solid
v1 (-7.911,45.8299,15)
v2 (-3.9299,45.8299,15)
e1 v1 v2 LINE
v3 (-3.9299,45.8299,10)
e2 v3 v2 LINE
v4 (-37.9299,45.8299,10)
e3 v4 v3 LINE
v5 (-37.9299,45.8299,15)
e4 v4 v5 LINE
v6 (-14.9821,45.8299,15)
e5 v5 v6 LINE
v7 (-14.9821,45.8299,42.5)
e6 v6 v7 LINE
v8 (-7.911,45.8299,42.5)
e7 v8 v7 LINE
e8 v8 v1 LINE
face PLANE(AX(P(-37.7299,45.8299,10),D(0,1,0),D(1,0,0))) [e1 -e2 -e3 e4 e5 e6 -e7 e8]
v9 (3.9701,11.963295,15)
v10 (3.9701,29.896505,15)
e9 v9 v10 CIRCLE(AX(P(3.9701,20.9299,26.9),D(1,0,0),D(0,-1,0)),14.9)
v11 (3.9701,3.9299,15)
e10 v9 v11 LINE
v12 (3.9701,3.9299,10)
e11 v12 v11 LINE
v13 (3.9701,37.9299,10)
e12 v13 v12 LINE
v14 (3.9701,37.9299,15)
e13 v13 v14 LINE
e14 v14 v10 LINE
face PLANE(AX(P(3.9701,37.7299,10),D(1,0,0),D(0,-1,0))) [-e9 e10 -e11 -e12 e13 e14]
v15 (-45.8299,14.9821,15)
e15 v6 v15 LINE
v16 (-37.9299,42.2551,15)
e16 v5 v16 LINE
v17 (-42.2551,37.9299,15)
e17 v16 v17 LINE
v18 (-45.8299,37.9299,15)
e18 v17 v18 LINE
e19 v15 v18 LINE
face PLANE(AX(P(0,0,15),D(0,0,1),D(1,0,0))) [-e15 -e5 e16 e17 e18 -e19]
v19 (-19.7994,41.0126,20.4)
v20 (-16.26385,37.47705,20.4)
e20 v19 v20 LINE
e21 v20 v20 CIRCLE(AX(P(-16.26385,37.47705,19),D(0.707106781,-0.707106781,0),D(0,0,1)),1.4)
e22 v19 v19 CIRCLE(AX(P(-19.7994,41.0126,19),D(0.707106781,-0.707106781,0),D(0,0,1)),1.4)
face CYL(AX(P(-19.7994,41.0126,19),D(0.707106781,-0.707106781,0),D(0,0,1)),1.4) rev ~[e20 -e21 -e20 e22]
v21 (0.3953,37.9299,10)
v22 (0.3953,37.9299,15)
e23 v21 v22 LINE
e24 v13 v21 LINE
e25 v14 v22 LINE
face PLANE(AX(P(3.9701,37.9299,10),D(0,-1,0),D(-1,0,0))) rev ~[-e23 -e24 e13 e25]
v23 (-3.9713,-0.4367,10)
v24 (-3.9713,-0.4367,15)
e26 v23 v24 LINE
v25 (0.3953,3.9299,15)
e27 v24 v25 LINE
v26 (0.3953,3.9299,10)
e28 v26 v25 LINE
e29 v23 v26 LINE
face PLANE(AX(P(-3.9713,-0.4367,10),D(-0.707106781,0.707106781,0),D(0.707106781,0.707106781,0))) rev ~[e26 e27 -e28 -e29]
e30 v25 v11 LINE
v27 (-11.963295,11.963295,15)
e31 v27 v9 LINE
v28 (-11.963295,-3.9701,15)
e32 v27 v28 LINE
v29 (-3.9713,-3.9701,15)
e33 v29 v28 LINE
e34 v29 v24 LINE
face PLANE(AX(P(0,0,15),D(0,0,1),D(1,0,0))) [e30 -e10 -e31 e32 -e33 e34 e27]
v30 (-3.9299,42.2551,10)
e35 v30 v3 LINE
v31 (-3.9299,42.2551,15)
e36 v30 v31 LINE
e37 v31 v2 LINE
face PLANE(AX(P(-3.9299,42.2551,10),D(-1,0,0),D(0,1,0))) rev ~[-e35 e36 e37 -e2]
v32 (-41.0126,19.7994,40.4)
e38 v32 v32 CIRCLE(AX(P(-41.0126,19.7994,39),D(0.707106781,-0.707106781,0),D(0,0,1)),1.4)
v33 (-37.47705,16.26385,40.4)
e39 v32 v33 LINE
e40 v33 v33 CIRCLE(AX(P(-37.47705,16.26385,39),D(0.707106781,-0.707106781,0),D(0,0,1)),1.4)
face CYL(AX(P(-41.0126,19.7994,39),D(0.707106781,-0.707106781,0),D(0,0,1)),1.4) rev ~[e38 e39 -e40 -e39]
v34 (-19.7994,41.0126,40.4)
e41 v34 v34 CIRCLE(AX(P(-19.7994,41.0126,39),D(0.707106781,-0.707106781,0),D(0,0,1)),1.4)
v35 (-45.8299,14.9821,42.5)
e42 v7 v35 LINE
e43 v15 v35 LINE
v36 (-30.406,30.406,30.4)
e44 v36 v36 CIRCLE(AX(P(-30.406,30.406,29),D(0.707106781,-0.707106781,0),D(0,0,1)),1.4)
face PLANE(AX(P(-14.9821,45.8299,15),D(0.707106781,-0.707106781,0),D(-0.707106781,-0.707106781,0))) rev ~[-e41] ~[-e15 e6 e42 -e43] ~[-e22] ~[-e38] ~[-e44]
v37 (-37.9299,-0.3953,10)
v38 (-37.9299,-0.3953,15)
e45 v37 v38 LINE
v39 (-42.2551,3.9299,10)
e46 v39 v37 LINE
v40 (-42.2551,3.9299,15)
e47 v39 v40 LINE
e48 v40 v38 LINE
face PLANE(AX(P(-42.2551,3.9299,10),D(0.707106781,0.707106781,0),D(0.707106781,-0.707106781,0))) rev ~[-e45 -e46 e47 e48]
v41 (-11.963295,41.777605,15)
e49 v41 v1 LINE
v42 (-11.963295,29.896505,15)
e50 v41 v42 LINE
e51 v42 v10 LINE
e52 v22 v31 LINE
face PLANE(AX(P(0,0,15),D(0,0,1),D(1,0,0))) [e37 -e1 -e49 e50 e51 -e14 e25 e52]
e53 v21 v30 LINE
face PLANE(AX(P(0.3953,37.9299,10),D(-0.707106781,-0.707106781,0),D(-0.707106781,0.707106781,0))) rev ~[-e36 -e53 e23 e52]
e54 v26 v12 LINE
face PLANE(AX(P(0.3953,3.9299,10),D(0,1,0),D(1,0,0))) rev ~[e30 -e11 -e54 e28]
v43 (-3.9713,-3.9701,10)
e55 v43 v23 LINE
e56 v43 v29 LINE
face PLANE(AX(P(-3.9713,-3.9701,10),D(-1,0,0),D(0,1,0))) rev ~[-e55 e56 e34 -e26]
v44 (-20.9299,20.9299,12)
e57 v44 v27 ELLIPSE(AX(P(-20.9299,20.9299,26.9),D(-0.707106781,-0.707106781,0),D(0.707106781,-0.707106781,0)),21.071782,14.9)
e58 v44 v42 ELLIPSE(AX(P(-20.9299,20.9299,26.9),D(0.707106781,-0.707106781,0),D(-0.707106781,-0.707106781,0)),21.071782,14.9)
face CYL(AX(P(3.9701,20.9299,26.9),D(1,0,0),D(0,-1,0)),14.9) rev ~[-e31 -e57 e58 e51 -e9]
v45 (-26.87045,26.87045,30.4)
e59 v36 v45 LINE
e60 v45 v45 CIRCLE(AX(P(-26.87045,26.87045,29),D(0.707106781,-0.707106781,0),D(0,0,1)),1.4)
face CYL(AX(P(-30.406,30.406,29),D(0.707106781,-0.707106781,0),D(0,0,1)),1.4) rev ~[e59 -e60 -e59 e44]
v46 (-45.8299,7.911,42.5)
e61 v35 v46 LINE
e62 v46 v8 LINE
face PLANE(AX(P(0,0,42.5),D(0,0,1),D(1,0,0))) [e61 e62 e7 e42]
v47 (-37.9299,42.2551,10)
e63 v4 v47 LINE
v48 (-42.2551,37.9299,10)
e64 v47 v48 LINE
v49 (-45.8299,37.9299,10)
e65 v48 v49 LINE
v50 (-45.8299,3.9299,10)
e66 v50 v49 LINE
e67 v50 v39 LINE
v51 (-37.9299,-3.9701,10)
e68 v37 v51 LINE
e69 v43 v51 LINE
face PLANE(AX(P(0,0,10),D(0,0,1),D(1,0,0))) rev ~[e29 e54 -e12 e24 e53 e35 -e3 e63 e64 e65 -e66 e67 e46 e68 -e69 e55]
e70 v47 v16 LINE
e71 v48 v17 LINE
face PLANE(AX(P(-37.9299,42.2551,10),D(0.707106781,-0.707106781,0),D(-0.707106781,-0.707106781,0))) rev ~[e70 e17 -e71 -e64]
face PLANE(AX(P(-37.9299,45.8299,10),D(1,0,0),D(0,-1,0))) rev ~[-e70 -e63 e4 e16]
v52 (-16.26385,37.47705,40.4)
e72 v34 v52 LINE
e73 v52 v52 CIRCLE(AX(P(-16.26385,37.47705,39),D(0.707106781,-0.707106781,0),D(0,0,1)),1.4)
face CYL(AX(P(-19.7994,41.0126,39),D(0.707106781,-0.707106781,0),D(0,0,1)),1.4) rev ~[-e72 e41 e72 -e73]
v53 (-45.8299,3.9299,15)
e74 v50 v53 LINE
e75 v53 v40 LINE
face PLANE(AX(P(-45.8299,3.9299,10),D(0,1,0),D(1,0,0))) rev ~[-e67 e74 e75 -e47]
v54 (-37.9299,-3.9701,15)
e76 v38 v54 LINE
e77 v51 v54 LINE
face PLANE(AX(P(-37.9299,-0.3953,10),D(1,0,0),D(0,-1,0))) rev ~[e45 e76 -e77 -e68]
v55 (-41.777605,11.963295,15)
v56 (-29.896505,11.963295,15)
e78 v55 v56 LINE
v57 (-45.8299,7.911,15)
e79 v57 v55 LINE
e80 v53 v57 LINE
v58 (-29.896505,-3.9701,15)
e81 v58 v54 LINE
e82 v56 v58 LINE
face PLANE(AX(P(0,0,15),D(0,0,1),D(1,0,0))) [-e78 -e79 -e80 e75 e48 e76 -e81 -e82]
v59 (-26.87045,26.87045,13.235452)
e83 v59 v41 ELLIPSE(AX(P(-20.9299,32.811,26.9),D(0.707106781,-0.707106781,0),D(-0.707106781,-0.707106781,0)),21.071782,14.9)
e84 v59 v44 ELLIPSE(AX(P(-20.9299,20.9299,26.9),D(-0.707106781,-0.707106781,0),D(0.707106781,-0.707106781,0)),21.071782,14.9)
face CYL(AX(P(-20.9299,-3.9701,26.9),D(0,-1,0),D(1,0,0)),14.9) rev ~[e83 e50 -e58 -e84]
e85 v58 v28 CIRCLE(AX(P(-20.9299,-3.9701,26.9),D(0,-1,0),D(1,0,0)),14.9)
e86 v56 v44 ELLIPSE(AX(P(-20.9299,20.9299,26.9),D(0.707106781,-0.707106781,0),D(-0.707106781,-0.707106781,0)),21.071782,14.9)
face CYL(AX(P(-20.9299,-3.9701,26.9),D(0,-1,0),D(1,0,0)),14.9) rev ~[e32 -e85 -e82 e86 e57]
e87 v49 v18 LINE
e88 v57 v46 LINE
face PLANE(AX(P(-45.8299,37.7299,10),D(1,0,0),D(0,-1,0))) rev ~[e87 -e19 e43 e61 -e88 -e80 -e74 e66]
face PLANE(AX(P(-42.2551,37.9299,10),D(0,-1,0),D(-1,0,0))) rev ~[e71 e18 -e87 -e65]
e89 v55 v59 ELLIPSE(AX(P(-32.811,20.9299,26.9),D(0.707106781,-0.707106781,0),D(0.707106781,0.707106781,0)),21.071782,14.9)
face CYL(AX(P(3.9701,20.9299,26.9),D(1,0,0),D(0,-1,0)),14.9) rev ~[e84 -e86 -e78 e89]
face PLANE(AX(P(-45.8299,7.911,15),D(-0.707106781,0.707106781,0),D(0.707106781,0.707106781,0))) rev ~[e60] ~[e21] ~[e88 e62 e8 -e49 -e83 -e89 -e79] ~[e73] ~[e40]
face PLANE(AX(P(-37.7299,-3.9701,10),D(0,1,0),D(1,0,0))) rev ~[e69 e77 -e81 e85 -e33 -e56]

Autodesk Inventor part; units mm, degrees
ref_plane "Work Plane1" through (0, 0, 10) normal (0, 0, 1) x (1, 0, 0)
sketch "Sketch1" plane through (0, 0, 10) normal (0, 0, 1) x (1, 0, 0)
  line L0 (-4.0299, -0.3538) -> (-2.2322, 1.4439) construction
  arc A0 (-1.4439, 2.2322) -> (-2.2322, 1.4439) centre (-0.9299, 0.9299) ccw construction
  line L1 (-1.4439, 2.2322) -> (0.3538, 4.0299) construction
  line L2 (-37.8299, 42.8299) -> (-37.8299, 37.8299) construction
  line L3 (-37.8299, 37.8299) -> (-42.9208, 37.8299) construction
  line L4 (-37.8299, 42.2137) -> (-37.8299, 45.8299) construction
  line L5 (-37.8299, 45.8299) -> (-4.0299, 45.8299) construction
  line L6 (-4.0299, 45.8299) -> (-4.0299, 42.2137) construction
  line L7 (-4.0299, 4.0299) -> (0.3538, 4.0299) projected
  circle A1 centre (-20.9299, 20.9299) radius 17.5 projected
  line L8 (-20.9299, 58.9723) -> (17.1124, 20.9299) construction
  line L9 (17.1124, 20.9299) -> (-20.9299, -17.1124) construction
  line L10 (-20.9299, -17.1124) -> (-58.9723, 20.9299) construction
  line L11 (-58.9723, 20.9299) -> (-20.9299, 58.9723) construction
  line L12 (-20.9299, 58.9723) -> (-20.9299, -17.1124) construction
  line L13 (17.1124, 20.9299) -> (-58.9723, 20.9299) construction
  line L14 (-20.9299, 58.9723) -> (32.8701, 58.9723) construction
  line L15 (-43.4299, 43.4299) -> (1.5701, 43.4299) construction
  line L16 (1.5701, 43.4299) -> (1.5701, -1.5701) construction
  line L17 (1.5701, -1.5701) -> (-43.4299, -1.5701) construction
  line L18 (-43.4299, -1.5701) -> (-43.4299, 43.4299) construction
  line L19 (-43.4299, 43.4299) -> (1.5701, -1.5701) construction
  line L20 (1.5701, 43.4299) -> (-43.4299, -1.5701) construction
  line L21 (-43.4299, 5.3876) -> (-43.4299, 36.4723)
  line L22 (-43.4299, 36.4723) -> (-36.4723, 43.4299)
  line L23 (-36.4723, 43.4299) -> (-5.3876, 43.4299)
  line L24 (-5.3876, 43.4299) -> (1.5701, 36.4723)
  line L25 (1.5701, 36.4723) -> (1.5701, 5.3876)
  line L26 (1.5701, 5.3876) -> (-5.3876, -1.5701)
  line L27 (-5.3876, -1.5701) -> (-36.4723, -1.5701)
  line L28 (-36.4723, -1.5701) -> (-43.4299, 5.3876)
  line L29 (-4.0299, 42.2137) -> (-37.8299, 42.2137) projected
  line L30 (-4.0299, -0.3538) -> (-4.0299, 4.0299) projected
  circle A2 centre (-20.9299, 20.9299) radius 1.4
  line L31 (-10.9299, 10.9299) -> (-30.9299, 10.9299) construction
  line L32 (-30.9299, 10.9299) -> (-30.9299, 30.9299) construction
  line L33 (-30.9299, 30.9299) -> (-10.9299, 30.9299) construction
  line L34 (-10.9299, 30.9299) -> (-10.9299, 10.9299) construction
  line L35 (-10.9299, 10.9299) -> (-30.9299, 30.9299) construction
  line L36 (-30.9299, 10.9299) -> (-10.9299, 30.9299) construction
  circle A3 centre (-30.9299, 30.9299) radius 1.4
  circle A4 centre (-30.9299, 10.9299) radius 1.4
  circle A5 centre (-10.9299, 10.9299) radius 1.4
  line L37 (-45.8299, 37.8299) -> (-42.0723, 37.8299) construction
  line L38 (-42.1723, 37.7299) -> (-45.8299, 37.7299)
  line L39 (-45.8299, 37.7299) -> (-45.8299, 4.1299)
  line L40 (-45.8299, 4.1299) -> (-42.1723, 4.1299)
  line L41 (-42.1723, 4.1299) -> (-42.1723, 37.7299)
  line L42 (-45.8299, 4.0299) -> (-42.0723, 4.0299) construction
  line L43 (-45.8299, 37.8299) -> (-42.0723, 37.8299) projected
  line L44 (-37.7299, 45.8299) -> (-4.1299, 45.8299)
  line L45 (-4.1299, 45.8299) -> (-4.1299, 42.1723)
  line L46 (-4.1299, 42.1723) -> (-37.7299, 42.1723)
  line L47 (-37.7299, 42.1723) -> (-37.7299, 45.8299)
  line L48 (0.4701, 37.8299) -> (0.4701, 4.0299) construction
  line L49 (0.4701, 4.0299) -> (3.9701, 4.0299) construction
  line L50 (3.9701, 37.8299) -> (3.9701, 4.0299) construction
  line L51 (0.4701, 37.8299) -> (3.9701, 37.8299) construction
  line L52 (-45.8299, -3.9701) -> (-4.0299, -3.9701) construction
  line L53 (0.3124, 37.7299) -> (3.9701, 37.7299)
  line L54 (3.9701, 37.7299) -> (3.9701, 4.1299)
  line L55 (3.9701, 4.1299) -> (0.3124, 4.1299)
  line L56 (0.3124, 4.1299) -> (0.3124, 37.7299)
  line L57 (-4.1713, -0.3538) -> (-37.7299, -0.3538)
  line L58 (-37.7299, -0.3538) -> (-37.7299, -3.9701)
  line L59 (-37.7299, -3.9701) -> (-4.1713, -3.9701)
  line L60 (-4.1713, -3.9701) -> (-4.1713, -0.3538)
  point P0 (-37.8299, 4.0299)
  dimension "d18" = 53.8
  dimension "d19" = 45
  dimension "d20" = 53.8
  dimension "d21" = 45
  dimension "d22" = 45
  dimension "d30" = 20
  dimension "d31" = 20
  dimension "d32" = 2.8
  dimension "d33" = 2.8
  dimension "d34" = 2.8
  dimension "d35" = 2.8
  dimension "d36" = 0.1
  dimension "d37" = 0.1
  dimension "d38" = 0.1
  dimension "d39" = 0.1
extrude "Extrusion1" add sketch "Sketch1" along normal blind 5 contours L30 L26 L57 L28 L41 L22 L46 L24 L56 L7 | L7 L26 L30 | L56 L24 L25 L26 | L26 L25 L24 L53 L54 L55 | L60 L59 L58 L57 L28 L27 L26 | L26 L27 L28 L57 | L46 L22 L29 L24 | L24 L29 L45 | L40 L39 L38 L22 L21 L28 | L28 L21 L22 L41 | L29 L22 L23 L24 | L24 L23 L22 L29 L47 L44 L45 | L47 L29 L22 | A1 | A2 | A3 | A4 | A5
sketch "Sketch4" plane through (0, 0, 15) normal (0, 0, 1) x (1, 0, 0)
  line L0 (-37.7299, 42.1723) -> (-42.1723, 37.7299) projected
  line L1 (-42.1723, 37.7299) -> (-45.8299, 37.7299) projected
  line L2 (-45.8299, 37.7299) -> (-45.8299, 4.1299) projected
  line L3 (-45.8299, 4.1299) -> (-42.1723, 4.1299) projected
  line L4 (-42.1723, 4.1299) -> (-37.6885, -0.3538) projected
  line L5 (-37.6885, -0.3538) -> (-37.7299, -0.3538) projected
  line L6 (-37.7299, -0.3538) -> (-37.7299, -3.9701) projected
  line L7 (-37.7299, -3.9701) -> (-4.1713, -3.9701) projected
  line L8 (-4.1713, -3.9701) -> (-4.1713, -0.3538) projected
  line L9 (-4.1713, -0.3538) -> (0.3124, 4.1299) projected
  line L10 (0.3124, 4.1299) -> (3.9701, 4.1299) projected
  line L11 (3.9701, 4.1299) -> (3.9701, 37.7299) projected
  line L12 (3.9701, 37.7299) -> (0.3124, 37.7299) projected
  line L13 (0.3124, 37.7299) -> (-4.1299, 42.1723) projected
  line L14 (-4.1299, 42.1723) -> (-4.1299, 45.8299) projected
  line L15 (-4.1299, 45.8299) -> (-37.7299, 45.8299) projected
  line L16 (-37.7299, 45.8299) -> (-37.7299, 42.1723) projected
  line L17 (-45.8299, 37.7299) -> (-45.8299, 4.1299) projected
  line L18 (-45.8299, 7.911) -> (-7.911, 45.8299)
  line L19 (-45.8299, 7.911) -> (7.7955, 7.911) construction
  line L20 (-7.911, 45.8299) -> (-14.9821, 45.8299)
  line L21 (-4.1299, 45.8299) -> (-37.7299, 45.8299) projected
  line L22 (-14.9821, 45.8299) -> (-45.8299, 14.9821)
  line L23 (-45.8299, 7.911) -> (-45.8299, 14.9821)
  circle A0 centre (-40.9299, 0.9299) radius 1.1933 projected
  line L24 (0.3124, 37.7299) -> (-4.1299, 42.1723) projected
  point P0 (0, 0)
  dimension "d40" = 45
  dimension "d41" = 5
extrude "Extrusion4" add sketch "Sketch4" along normal blind 27.5 contours L15 L18 L2 L22
sketch "Sketch5" plane through (-45.8299, 14.9821, 15) normal (-0.7071068, 0.7071068, 0) x (-0.7071068, -0.7071068, 0)
  line L0 (0, 0) -> (-43.6254, 0) projected
  line L1 (0, 0) -> (0, 27.5) projected
  line L2 (-43.6254, 27.5) -> (0, 27.5) projected
  line L3 (-43.6254, 0) -> (-43.6254, 27.5) projected
  circle A0 centre (-21.8127, 5.6873) radius 21.8127
  line L4 (-6.8127, 24) -> (-36.8127, 24) construction
  line L5 (-36.8127, 24) -> (-36.8127, 4) construction
  line L6 (-36.8127, 4) -> (-6.8127, 4) construction
  line L7 (-6.8127, 4) -> (-6.8127, 24) construction
  line L8 (-6.8127, 24) -> (-36.8127, 4) construction
  line L9 (-36.8127, 24) -> (-6.8127, 4) construction
  point P0 (-21.8127, -15)
  point P1 (-21.8127, 14)
  dimension "d44" = 30
  dimension "d45" = 20
hole "Hole1" at (-19.7994, 41.0126, 39) at (-19.7994, 41.0126, 19) at (-41.0126, 19.7994, 39) at (-30.406, 30.406, 29) direction (0.7071068, -0.7071068, 0) diameter 2.8 depth 12
sketch "Sketch6" plane through (-37.7299, -3.9701, 10) normal (0, -1, 0) x (1, 0, 0)
  circle A0 centre (-3.2, 36.9) radius 1.45 projected
  circle A1 centre (36.8, 36.9) radius 1.45 projected
  line L0 (-6.1, 0) -> (-6.1, 39.8) projected
  line L1 (-0.1, 0) -> (-6.1, 0) projected
  line L2 (-0.1, 33.8) -> (-0.1, 0) projected
  line L3 (33.7, 33.8) -> (-0.1, 33.8) projected
  line L4 (33.7, 33.8) -> (33.7, 0) projected
  line L5 (39.7, 0) -> (33.7, 0) projected
  line L6 (39.7, 39.8) -> (39.7, 0) projected
  line L7 (-6.1, 39.8) -> (39.7, 39.8) projected
  circle A2 centre (16.8, 16.9) radius 16.9
  circle A3 centre (16.8, 16.9) radius 14.9
  line L8 (-0.1, 16.9) -> (-0.1, 0)
  line L9 (0, 0) -> (33.5586, 0) projected
  line L10 (0.0414, 0) -> (-4.4423, 0) projected
  line L11 (33.5586, 0) -> (0.0414, 0)
  line L12 (33.7, 16.9) -> (33.5586, 0)
  point P0 (37.7299, -10)
  dimension "d53" = 2
extrude "Extrusion5" cut sketch "Sketch6" against normal up to surface contours A3 surface through (-45.8299, 7.911, 15) normal (0.7071068, -0.7071068, 0)
ref_plane "Work Plane3" through (3.9701, 45.8299, 26) normal (1, 0, 0) x (0, -1, 0)
sketch "Sketch7" plane through (3.9701, 45.8299, 26) normal (1, 0, 0) x (0, -1, 0)
  line L0 (41.8, -17.8) -> (41.8, 16)
  line L1 (8, -17.8) -> (41.8, -17.8)
  line L2 (8, -17.8) -> (8, 16)
  circle A0 centre (24.9, -0.9) radius 16.9
  circle A1 centre (24.9, -0.9) radius 14.9
  point P0 (45.8299, 26)
  dimension "d56" = 2
ref_plane "Work Plane4" through (-34.8055, 8.3289, 16.6138) normal (0.7071068, -0.7071068, 0) x (0.7071068, 0.7071068, 0)
extrude "Extrusion6" cut sketch "Sketch7" against normal up to surface contours A1 surface through (-45.8299, 7.911, 15) normal (0.7071068, -0.7071068, 0)
sketch "Skizze8" plane through (0, 0, 10) normal (0, 0, -1) x (-1, 0, 0)
  line L0 (42.1723, 37.7299) -> (37.7299, 42.1723) projected
  line L1 (37.7299, 45.8299) -> (37.7299, 42.1723) projected
  line L2 (4.1299, 45.8299) -> (37.7299, 45.8299) construction
  line L3 (4.1299, 42.1723) -> (4.1299, 45.8299) projected
  line L4 (4.1299, 42.1723) -> (-0.3124, 37.7299) projected
  line L5 (-3.9701, 37.7299) -> (-0.3124, 37.7299) projected
  line L6 (-3.9701, 4.1299) -> (-3.9701, 37.7299) construction
  line L7 (-0.3124, 4.1299) -> (-3.9701, 4.1299) projected
  line L8 (-0.3124, 4.1299) -> (4.1713, -0.3538) projected
  line L9 (4.1713, -3.9701) -> (4.1713, -0.3538) projected
  line L10 (37.7299, -3.9701) -> (4.1713, -3.9701) construction
  line L11 (37.7299, -0.3538) -> (37.7299, -3.9701) projected
  line L12 (37.6885, -0.3538) -> (37.7299, -0.3538) projected
  line L13 (37.6885, -0.3538) -> (42.1723, 4.1299) projected
  line L14 (45.8299, 4.1299) -> (42.1723, 4.1299) projected
  line L15 (45.8299, 37.7299) -> (45.8299, 4.1299) construction
  line L16 (42.1723, 37.7299) -> (45.8299, 37.7299) projected
  line L17 (46.0299, 3.9299) -> (42.2551, 3.9299)
  line L18 (42.2551, 3.9299) -> (37.9299, -0.3953)
  line L19 (37.9299, -0.3953) -> (37.9299, -4.1701)
  line L20 (37.9299, -4.1701) -> (3.9713, -4.1701) construction
  line L21 (3.9713, -4.1701) -> (3.9713, -0.4367)
  line L22 (3.9713, -0.4367) -> (-0.3953, 3.9299)
  line L23 (-0.3953, 3.9299) -> (-4.1701, 3.9299)
  line L24 (-4.1701, 3.9299) -> (-4.1701, 37.9299) construction
  line L25 (-4.1701, 37.9299) -> (-0.3953, 37.9299)
  line L26 (-0.3953, 37.9299) -> (3.9299, 42.2551)
  line L27 (3.9299, 42.2551) -> (3.9299, 46.0299)
  line L28 (3.9299, 46.0299) -> (37.9299, 46.0299) construction
  line L29 (37.9299, 46.0299) -> (37.9299, 42.2551)
  line L30 (37.9299, 42.2551) -> (42.2551, 37.9299)
  line L31 (42.2551, 37.9299) -> (46.0299, 37.9299)
  line L32 (46.0299, 37.9299) -> (46.0299, 3.9299) construction
  line L33 (37.7299, 45.8299) -> (37.7299, 42.1723) projected
  line L34 (37.7299, 45.8299) -> (37.9299, 45.8299)
  line L35 (42.1723, 37.7299) -> (45.8299, 37.7299) projected
  line L36 (45.8299, 37.7299) -> (45.8299, 37.9299)
  line L37 (45.8299, 4.1299) -> (45.8299, 3.9299)
  line L38 (37.7299, -3.9701) -> (4.1713, -3.9701) projected
  line L39 (37.7299, -3.9701) -> (37.9299, -3.9701)
  line L40 (4.1713, -3.9701) -> (3.9713, -3.9701)
  line L41 (-3.9701, 4.1299) -> (-3.9701, 3.9299)
  line L42 (-3.9701, 37.7299) -> (-0.3124, 37.7299) projected
  line L43 (-3.9701, 37.7299) -> (-3.9701, 37.9299)
  line L44 (4.1299, 42.1723) -> (4.1299, 45.8299) projected
  line L45 (4.1299, 45.8299) -> (3.9299, 45.8299)
  point P0 (0, 0)
  dimension "d59" = 0.2
extrude "IM_offset" add sketch "Skizze8" against normal up to surface (5 mm away)
properties part number "20_Cube_Insert_Kinematic_Mirrormount_45_base_v3_aaa"
